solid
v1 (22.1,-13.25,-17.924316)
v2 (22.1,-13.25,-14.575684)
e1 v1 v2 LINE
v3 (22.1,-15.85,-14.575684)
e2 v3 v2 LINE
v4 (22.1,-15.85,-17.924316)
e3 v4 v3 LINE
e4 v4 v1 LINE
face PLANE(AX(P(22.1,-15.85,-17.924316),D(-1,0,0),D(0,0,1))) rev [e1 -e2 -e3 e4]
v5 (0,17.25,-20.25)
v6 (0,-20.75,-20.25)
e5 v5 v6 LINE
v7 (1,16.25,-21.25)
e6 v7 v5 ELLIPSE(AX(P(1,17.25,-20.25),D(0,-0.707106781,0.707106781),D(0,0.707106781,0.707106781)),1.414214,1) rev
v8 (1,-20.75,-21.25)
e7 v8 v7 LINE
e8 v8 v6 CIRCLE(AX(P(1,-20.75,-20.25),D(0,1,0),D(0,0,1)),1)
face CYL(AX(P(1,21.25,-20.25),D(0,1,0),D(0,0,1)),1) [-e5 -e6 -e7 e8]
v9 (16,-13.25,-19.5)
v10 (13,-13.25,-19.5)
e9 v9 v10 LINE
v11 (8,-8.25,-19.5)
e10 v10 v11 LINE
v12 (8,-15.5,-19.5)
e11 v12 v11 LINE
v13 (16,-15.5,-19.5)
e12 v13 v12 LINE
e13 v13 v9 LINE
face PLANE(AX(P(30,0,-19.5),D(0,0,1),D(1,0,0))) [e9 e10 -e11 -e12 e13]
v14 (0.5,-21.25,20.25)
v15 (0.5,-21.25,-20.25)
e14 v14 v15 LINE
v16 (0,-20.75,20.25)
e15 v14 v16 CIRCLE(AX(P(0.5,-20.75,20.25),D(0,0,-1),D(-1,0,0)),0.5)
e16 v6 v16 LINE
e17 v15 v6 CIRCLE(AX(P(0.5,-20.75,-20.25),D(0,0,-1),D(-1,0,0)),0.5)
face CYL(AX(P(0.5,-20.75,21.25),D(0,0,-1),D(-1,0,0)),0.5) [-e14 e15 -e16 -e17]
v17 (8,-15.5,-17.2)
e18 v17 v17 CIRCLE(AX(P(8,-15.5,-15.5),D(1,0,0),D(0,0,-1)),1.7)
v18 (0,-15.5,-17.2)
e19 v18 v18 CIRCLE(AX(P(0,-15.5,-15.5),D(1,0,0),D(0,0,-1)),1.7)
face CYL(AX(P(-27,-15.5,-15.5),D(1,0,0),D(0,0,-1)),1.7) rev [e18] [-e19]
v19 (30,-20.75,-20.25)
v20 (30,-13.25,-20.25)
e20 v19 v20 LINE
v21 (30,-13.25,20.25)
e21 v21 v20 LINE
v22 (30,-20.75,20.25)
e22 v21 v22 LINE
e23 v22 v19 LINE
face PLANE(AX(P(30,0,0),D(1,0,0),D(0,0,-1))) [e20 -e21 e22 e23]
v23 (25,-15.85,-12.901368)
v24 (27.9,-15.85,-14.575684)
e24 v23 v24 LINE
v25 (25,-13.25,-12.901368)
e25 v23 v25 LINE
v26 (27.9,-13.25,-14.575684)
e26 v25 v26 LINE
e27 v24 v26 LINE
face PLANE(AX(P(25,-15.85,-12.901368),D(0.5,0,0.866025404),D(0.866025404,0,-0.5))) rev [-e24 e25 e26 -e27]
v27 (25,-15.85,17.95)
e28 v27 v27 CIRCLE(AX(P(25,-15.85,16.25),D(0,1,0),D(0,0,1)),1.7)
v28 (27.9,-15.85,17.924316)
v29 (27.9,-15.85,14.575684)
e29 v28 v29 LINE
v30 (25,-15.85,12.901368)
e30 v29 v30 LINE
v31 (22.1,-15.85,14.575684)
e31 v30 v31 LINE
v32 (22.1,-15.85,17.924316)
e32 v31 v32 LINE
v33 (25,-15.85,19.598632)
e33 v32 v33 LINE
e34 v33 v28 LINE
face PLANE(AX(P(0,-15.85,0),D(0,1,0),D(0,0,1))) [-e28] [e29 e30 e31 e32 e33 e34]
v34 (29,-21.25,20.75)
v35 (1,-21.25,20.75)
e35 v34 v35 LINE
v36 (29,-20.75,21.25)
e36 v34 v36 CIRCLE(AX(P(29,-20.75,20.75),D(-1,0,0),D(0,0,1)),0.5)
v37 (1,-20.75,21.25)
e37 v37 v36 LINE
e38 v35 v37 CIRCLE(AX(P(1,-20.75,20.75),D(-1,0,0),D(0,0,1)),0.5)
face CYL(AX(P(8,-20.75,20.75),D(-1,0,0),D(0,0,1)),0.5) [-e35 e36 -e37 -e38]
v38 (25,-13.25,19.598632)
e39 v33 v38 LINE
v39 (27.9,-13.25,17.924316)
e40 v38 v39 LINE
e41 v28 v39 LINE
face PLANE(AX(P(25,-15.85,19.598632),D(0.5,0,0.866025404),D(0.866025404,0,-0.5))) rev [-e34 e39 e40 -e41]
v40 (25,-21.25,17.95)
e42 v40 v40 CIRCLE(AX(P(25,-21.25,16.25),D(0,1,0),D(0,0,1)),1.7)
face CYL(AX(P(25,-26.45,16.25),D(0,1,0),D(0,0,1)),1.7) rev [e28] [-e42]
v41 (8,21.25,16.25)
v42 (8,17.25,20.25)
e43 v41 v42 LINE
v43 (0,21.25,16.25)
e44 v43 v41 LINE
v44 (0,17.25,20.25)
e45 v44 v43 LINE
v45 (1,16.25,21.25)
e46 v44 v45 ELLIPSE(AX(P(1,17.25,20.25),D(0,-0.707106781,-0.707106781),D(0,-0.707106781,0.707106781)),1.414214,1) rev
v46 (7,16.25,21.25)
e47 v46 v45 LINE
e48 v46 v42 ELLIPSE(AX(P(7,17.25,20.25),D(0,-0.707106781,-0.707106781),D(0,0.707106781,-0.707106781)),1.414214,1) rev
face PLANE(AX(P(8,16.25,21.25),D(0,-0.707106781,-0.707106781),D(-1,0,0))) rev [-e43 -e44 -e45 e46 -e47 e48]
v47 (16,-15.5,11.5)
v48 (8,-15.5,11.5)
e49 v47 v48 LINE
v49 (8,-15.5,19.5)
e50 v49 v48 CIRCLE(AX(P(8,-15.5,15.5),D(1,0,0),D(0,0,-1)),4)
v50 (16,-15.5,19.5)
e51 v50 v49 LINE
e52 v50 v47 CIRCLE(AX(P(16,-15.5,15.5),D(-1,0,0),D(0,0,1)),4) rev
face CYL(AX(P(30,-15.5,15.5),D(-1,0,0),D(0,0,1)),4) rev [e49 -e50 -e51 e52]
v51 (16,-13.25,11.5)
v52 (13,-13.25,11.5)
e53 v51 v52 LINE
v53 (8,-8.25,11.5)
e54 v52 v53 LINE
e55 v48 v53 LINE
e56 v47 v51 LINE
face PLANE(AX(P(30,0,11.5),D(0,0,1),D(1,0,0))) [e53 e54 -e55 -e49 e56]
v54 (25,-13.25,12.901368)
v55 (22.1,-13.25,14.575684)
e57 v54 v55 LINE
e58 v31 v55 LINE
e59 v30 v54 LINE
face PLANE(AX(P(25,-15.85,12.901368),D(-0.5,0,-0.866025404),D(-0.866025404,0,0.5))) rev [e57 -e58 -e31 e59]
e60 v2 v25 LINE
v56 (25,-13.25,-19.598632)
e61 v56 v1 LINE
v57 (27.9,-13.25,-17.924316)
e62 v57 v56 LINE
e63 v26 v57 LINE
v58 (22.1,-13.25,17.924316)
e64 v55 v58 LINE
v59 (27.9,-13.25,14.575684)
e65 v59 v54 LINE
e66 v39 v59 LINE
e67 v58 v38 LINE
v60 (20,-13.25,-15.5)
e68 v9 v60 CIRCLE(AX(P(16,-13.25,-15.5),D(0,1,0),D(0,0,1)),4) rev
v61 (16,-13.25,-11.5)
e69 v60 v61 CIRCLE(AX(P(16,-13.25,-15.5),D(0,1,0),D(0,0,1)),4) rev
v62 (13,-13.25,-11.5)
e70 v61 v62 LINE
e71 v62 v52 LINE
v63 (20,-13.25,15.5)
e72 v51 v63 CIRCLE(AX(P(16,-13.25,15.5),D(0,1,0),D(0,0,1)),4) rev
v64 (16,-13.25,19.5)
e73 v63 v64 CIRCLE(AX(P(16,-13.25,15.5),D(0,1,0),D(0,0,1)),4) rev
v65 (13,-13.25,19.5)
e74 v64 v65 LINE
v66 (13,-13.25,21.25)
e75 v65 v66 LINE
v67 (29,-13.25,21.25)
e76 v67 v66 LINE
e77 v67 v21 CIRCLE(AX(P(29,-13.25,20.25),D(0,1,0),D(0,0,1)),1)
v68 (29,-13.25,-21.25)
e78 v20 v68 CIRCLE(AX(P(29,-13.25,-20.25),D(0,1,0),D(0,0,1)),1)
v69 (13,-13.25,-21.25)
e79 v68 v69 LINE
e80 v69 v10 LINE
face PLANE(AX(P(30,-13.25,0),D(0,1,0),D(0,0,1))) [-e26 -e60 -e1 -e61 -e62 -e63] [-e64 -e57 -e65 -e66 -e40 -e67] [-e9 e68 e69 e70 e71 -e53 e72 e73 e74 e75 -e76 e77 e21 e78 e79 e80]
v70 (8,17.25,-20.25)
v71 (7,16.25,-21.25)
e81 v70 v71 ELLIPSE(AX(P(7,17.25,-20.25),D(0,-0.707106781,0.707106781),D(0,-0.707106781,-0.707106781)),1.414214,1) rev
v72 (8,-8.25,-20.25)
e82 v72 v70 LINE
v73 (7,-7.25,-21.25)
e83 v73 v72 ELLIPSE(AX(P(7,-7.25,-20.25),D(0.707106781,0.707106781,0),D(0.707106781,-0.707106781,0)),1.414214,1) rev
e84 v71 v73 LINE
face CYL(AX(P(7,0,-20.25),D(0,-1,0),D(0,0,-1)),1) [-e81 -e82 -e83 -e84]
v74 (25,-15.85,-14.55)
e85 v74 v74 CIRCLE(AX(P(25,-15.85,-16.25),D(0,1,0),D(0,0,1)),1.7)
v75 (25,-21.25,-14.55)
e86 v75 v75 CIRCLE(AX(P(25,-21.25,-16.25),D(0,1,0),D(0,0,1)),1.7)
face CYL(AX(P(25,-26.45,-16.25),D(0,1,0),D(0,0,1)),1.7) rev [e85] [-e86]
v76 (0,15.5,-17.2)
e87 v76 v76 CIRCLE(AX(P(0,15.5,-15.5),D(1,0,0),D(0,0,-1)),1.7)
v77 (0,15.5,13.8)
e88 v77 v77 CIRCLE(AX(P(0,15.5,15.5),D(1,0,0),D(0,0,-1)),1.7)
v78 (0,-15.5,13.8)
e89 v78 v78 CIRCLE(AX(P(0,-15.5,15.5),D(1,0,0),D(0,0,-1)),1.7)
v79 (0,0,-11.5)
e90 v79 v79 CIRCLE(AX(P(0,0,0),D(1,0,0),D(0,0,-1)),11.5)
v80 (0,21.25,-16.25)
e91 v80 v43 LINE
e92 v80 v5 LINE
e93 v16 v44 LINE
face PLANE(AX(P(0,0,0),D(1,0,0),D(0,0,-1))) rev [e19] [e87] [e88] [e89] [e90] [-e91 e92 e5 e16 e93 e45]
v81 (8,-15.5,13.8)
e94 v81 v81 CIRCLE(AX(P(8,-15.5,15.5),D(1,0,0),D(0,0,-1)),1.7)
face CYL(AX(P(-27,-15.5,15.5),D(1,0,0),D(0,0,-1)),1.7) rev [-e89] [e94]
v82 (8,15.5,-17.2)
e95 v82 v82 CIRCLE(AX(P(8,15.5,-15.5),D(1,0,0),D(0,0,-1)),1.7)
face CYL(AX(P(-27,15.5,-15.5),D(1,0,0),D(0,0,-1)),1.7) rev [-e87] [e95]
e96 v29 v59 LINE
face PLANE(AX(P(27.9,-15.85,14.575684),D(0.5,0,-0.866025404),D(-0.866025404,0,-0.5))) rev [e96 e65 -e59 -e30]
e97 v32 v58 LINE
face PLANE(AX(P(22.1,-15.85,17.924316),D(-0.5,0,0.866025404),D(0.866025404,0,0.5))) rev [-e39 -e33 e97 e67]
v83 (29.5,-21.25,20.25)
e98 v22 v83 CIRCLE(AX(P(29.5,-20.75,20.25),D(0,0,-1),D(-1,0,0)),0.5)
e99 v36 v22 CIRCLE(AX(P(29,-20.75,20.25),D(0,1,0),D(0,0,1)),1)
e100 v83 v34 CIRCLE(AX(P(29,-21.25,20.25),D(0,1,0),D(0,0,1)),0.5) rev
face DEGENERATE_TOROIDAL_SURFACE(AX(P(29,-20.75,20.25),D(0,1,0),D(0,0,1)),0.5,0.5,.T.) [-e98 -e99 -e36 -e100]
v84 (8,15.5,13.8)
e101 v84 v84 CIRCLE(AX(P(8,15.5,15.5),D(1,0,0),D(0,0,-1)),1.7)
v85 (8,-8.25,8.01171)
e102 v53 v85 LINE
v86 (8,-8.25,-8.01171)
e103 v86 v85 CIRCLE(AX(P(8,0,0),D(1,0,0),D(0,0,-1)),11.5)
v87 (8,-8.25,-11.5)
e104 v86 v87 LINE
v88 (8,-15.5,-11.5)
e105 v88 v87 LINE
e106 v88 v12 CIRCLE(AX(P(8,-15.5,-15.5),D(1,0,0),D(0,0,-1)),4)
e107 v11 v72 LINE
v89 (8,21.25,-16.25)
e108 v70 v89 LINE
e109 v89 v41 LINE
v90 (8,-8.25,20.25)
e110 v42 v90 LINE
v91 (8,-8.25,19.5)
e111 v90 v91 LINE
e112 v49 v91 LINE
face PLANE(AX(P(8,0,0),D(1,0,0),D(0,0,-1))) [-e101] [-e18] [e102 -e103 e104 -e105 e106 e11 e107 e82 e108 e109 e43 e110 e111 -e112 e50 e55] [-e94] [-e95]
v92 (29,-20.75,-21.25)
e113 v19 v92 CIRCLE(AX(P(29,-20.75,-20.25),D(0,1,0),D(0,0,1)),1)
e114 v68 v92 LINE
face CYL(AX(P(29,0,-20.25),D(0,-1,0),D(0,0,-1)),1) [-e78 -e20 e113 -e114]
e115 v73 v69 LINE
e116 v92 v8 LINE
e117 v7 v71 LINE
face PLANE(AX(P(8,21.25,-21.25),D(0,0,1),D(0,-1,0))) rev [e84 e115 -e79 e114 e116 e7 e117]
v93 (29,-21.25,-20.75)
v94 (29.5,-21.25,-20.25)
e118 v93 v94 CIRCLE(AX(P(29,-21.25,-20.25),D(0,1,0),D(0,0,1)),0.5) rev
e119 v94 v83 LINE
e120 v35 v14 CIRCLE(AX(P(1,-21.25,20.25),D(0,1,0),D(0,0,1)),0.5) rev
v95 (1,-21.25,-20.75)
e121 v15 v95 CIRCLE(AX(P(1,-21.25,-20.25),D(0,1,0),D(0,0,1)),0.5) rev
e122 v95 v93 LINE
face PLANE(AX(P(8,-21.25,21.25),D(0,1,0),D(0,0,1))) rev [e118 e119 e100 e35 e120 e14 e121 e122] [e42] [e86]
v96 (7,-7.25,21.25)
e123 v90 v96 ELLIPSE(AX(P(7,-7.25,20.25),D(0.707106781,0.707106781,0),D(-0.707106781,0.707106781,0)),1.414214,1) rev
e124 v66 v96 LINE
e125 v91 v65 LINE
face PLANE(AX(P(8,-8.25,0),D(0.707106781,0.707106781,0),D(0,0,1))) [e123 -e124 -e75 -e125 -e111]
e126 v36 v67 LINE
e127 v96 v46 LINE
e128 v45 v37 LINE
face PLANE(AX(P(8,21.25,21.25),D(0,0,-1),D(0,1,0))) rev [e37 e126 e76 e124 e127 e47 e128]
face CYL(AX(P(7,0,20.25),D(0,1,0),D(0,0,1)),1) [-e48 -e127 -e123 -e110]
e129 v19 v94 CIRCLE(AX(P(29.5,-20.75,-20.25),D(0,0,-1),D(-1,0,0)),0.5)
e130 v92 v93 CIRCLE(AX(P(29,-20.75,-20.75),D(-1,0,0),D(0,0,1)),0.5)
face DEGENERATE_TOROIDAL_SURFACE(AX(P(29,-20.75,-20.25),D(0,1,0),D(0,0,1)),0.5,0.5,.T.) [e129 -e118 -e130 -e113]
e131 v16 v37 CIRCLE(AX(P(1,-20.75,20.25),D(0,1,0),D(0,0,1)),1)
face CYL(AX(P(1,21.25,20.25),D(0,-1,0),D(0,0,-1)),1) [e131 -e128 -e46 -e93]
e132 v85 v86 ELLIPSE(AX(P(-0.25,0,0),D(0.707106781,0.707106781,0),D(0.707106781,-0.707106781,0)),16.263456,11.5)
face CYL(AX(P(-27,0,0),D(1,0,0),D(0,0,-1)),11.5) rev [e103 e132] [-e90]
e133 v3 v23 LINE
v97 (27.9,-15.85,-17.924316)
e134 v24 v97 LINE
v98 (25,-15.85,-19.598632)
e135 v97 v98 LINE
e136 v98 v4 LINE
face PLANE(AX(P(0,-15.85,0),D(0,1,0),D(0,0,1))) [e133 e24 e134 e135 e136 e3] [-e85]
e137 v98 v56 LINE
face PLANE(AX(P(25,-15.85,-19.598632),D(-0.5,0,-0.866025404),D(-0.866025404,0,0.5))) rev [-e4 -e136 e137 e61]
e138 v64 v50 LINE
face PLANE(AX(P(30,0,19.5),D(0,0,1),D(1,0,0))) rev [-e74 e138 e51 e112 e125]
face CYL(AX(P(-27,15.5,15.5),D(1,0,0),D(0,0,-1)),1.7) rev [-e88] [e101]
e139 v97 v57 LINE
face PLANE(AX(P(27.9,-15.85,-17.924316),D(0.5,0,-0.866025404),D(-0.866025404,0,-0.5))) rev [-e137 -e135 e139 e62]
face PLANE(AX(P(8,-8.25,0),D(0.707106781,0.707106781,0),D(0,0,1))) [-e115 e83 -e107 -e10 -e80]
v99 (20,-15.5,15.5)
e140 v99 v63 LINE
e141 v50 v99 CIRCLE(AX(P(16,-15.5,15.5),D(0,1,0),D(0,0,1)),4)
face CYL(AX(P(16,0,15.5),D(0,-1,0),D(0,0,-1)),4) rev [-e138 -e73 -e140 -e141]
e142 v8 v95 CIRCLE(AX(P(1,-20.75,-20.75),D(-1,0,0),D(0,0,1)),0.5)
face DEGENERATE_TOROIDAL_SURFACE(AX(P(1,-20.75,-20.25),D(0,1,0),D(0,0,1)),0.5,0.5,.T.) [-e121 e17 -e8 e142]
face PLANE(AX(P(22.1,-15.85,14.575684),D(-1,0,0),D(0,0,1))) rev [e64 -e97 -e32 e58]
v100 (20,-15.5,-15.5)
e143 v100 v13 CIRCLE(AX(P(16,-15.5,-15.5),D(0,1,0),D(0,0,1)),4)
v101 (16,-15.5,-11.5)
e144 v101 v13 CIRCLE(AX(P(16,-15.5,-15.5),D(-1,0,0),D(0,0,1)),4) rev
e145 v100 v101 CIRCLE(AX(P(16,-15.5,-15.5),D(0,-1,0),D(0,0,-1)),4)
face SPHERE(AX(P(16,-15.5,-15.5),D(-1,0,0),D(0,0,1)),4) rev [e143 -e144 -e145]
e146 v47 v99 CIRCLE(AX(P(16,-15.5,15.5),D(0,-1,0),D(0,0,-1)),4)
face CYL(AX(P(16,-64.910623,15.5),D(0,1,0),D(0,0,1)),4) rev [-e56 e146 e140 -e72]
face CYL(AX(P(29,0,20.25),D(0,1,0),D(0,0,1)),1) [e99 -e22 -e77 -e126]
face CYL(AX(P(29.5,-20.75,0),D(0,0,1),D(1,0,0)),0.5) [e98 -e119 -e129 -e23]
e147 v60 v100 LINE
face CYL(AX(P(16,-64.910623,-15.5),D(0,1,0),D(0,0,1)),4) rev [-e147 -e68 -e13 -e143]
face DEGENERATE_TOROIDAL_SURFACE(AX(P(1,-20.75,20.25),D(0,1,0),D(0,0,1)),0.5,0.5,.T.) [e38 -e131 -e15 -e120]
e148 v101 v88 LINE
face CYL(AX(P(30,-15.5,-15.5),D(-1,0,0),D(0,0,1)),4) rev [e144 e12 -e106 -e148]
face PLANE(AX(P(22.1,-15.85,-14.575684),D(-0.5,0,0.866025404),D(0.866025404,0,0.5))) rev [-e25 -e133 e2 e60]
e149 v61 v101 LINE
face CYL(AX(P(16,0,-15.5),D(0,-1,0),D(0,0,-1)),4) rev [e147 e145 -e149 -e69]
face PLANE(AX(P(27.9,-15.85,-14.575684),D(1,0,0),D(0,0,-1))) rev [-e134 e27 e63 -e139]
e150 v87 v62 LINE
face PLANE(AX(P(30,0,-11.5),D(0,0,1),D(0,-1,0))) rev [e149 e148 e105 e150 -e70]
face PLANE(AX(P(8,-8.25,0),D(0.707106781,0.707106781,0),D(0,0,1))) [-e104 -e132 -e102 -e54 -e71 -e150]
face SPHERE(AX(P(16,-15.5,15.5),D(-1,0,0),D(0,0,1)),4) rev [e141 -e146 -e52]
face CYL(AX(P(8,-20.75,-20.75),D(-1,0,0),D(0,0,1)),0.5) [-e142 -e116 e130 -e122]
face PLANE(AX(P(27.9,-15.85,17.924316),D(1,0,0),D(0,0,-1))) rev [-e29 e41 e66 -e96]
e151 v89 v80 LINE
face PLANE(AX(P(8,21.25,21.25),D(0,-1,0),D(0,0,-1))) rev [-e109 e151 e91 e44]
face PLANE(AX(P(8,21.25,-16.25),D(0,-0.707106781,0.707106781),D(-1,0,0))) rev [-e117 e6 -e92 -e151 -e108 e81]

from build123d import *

# Parameters (mm, degrees)
SKETCH1_W           = 42.5
SKETCH1_H           = 42.5
BOSS_EXTRUDE1_DEPTH = 8
SKETCH2_R           = 1.7
SKETCH2_R_2         = 11.5
CUT_EXTRUDE1_DEPTH  = 35
BOSS_EXTRUDE2_DEPTH = 22
BOSS_EXTRUDE3_REACH = 52.416
SKETCH5_W           = 10
SKETCH5_H           = 42.5
FILLET1_R           = 4
FILLET2_R           = 4
CHAMFER2_SIZE       = 5
CUT_EXTRUDE2_DEPTH  = 2.6
SKETCH7_R           = 1.7
CUT_EXTRUDE3_DEPTH  = 10.6
CHAMFER3_SIZE       = 5
FILLET3_R           = 1
FILLET4_R           = 1
FILLET5_R           = 0.5


# Some blends are built 0.0001 mm under size
with BuildPart() as part:
    # Sketch1 → Boss-Extrude1 (new body)
    with BuildSketch(Plane(origin=(0, 0, 0), x_dir=(0, 0, -1), z_dir=(1, 0, 0))):
        Rectangle(SKETCH1_W, SKETCH1_H)
    extrude(amount=BOSS_EXTRUDE1_DEPTH)

    # Sketch2 → Cut-Extrude1 (cut)
    with BuildSketch(Plane(origin=(8, 0, 0), x_dir=(0, 0, -1), z_dir=(1, 0, 0))):
        with Locations((-15.5, 15.5)):
            Circle(SKETCH2_R)
        with Locations((15.5, 15.5)):
            Circle(SKETCH2_R)
        with Locations((-15.5, -15.5)):
            Circle(SKETCH2_R)
        with Locations((15.5, -15.5)):
            Circle(SKETCH2_R)
        Circle(SKETCH2_R_2)
    extrude(amount=-CUT_EXTRUDE1_DEPTH, mode=Mode.SUBTRACT)

    # Sketch3 → Boss-Extrude2 (add)
    with BuildSketch(Plane(origin=(8, 0, 0), x_dir=(0, 0, -1), z_dir=(1, 0, 0))):
        with BuildLine():
            Line((-19.5, -13.25), (-21.25, -13.25))
            Line((-21.25, -13.25), (-21.25, -21.25))
            Line((-21.25, -21.25), (21.25, -21.25))
            Line((21.25, -21.25), (21.25, -13.25))
            Line((21.25, -13.25), (19.5, -13.25))
            Line((19.5, -13.25), (19.5, -15.5))
            ThreePointArc((19.5, -15.5), (15.5, -19.5), (11.5, -15.5))
            Line((11.5, -15.5), (11.5, -13.25))
            Line((11.5, -13.25), (-11.5, -13.25))
            Line((-11.5, -13.25), (-11.5, -15.5))
            ThreePointArc((-11.5, -15.5), (-15.5, -19.5), (-19.5, -15.5))
            Line((-19.5, -15.5), (-19.5, -13.25))
        make_face()
    extrude(amount=BOSS_EXTRUDE2_DEPTH)

    # Boss-Extrude3: up to this face of the body (flat: up to its plane)
    boss_extrude3_end = Plane(part.part.faces().sort_by_distance((15, -21.25, 0))[0])
    # Sketch5 → Boss-Extrude3 (add, up to the picked face)
    with BuildSketch(Plane(origin=(0, -13.25, 0), x_dir=(1, 0, 0), z_dir=(0, 1, 0)), mode=Mode.PRIVATE) as boss_extrude3_sk1:
        with Locations((25, 0)):
            Rectangle(SKETCH5_W, SKETCH5_H)
    boss_extrude3_tool1 = split(extrude(boss_extrude3_sk1.sketch, amount=-BOSS_EXTRUDE3_REACH, mode=Mode.PRIVATE), bisect_by=boss_extrude3_end, keep=Keep.BOTH, mode=Mode.PRIVATE)
    add(boss_extrude3_tool1.solids().sort_by(Axis((25, -13.25, 0), (0, -1, 0)))[0])

    # Fillet1
    fillet1_edges = [part.edges().sort_by_distance(p)[0] for p in [
        (20, -14.375, 11.5),
        (20, -19.5, 15.5),
        (20, -14.375, 19.5),
    ]]
    fillet(fillet1_edges, radius=FILLET1_R - 0.0001)  # a hair under: the kernel refuses the full size

    # Fillet2
    fillet2_edges = [part.edges().sort_by_distance(p)[0] for p in [
        (20, -14.375, -11.5),
        (20, -19.5, -15.5),
        (20, -14.375, -19.5),
    ]]
    fillet(fillet2_edges, radius=FILLET2_R - 0.0001)  # a hair under: the kernel refuses the full size

    # Chamfer2
    # the kernel refuses this chamfer: 5 mm, written as the material it adds along each edge
    with BuildSketch(Plane(origin=(8, -13.25, -21.25), x_dir=(0.9996219169112968, -0.027495876610586317, 0), z_dir=(0, 0, 1)), Plane(origin=(8, -13.25, 19.5), x_dir=(0.9996219169112968, -0.027495876610586317, 0), z_dir=(0, 0, 1))) as chamfer2_piece_1:
        Polygon((CHAMFER2_SIZE * 0.999621916911, CHAMFER2_SIZE * 0.0274958766106), (-CHAMFER2_SIZE * 0.0274958766106, CHAMFER2_SIZE * 0.999621916911), (0, 0), align=None)
    extrude(amount=1.75)
    with BuildSketch(Plane(origin=(8, -13.25, -21.25), x_dir=(0.9996219169112968, -0.027495876610586317, 0), z_dir=(0, 0, 1))) as chamfer2_piece_2_section:
        Polygon((CHAMFER2_SIZE * 0.999621916911, CHAMFER2_SIZE * 0.0274958766106), (-CHAMFER2_SIZE * 0.0274958766106, CHAMFER2_SIZE * 0.999621916911), (0, 0), align=None)
    chamfer2_piece_2 = extrude(amount=14.60841494, mode=Mode.PRIVATE)
    chamfer2_piece_2 = split(chamfer2_piece_2, bisect_by=Plane(origin=(9.660792582, -11.623563686, -11.5), z_dir=(0, 0, 1)), keep=Keep.TOP, mode=Mode.PRIVATE)
    chamfer2_piece_2 = chamfer2_piece_2 - Plane(origin=(9.660792582, 0, 0), x_dir=(0, 0, -1), z_dir=(1, 0, 0)) * Cylinder(11.5, 50, mode=Mode.PRIVATE)
    add(chamfer2_piece_2)
    with BuildSketch(Plane(origin=(8, -13.25, 6.64158506), x_dir=(0.9996219169112968, -0.027495876610586313, 0), z_dir=(0, 0, 1))) as chamfer2_piece_3_section:
        Polygon((CHAMFER2_SIZE * 0.999621916911, CHAMFER2_SIZE * 0.0274958766106), (-CHAMFER2_SIZE * 0.0274958766106, CHAMFER2_SIZE * 0.999621916911), (0, 0), align=None)
    chamfer2_piece_3 = extrude(amount=14.60841494, mode=Mode.PRIVATE)
    chamfer2_piece_3 = split(chamfer2_piece_3, bisect_by=Plane(origin=(9.660792582, -11.623563686, 11.5), z_dir=(0, 0, -1)), keep=Keep.TOP, mode=Mode.PRIVATE)
    chamfer2_piece_3 = chamfer2_piece_3 - Plane(origin=(9.660792582, 0, 0), x_dir=(0, 0, -1), z_dir=(1, 0, 0)) * Cylinder(11.5, 50, mode=Mode.PRIVATE)
    add(chamfer2_piece_3)
    with BuildSketch(Plane(origin=(8, -13.25, -24.35841494), x_dir=(0.9996219169112968, -0.027495876610586313, 0), z_dir=(0, 0, 1))) as chamfer2_piece_4_section:
        Polygon((CHAMFER2_SIZE * 0.999621916911, CHAMFER2_SIZE * 0.0274958766106), (-CHAMFER2_SIZE * 0.0274958766106, CHAMFER2_SIZE * 0.999621916911), (0, 0), align=None)
    chamfer2_piece_4 = extrude(amount=35.85841494, mode=Mode.PRIVATE)
    chamfer2_piece_4 = split(chamfer2_piece_4, bisect_by=Plane(origin=(9.648968134, -11.601031866, -19.5), z_dir=(0, 0, -1)), keep=Keep.TOP, mode=Mode.PRIVATE)
    chamfer2_piece_4 = split(chamfer2_piece_4, bisect_by=Plane(origin=(9.648968134, -11.601031866, -21.25), z_dir=(0, 0, 1)), keep=Keep.TOP, mode=Mode.PRIVATE)
    add(chamfer2_piece_4)
    with BuildSketch(Plane(origin=(8, -13.25, -11.5), x_dir=(0.9996219169112968, -0.027495876610586317, 0), z_dir=(0, 0, 1))) as chamfer2_piece_5_section:
        Polygon((CHAMFER2_SIZE * 0.999621916911, CHAMFER2_SIZE * 0.0274958766106), (-CHAMFER2_SIZE * 0.0274958766106, CHAMFER2_SIZE * 0.999621916911), (0, 0), align=None)
    chamfer2_piece_5 = extrude(amount=23, mode=Mode.PRIVATE)
    chamfer2_piece_5 = chamfer2_piece_5 - Plane(origin=(9.815143963, 0, 0), x_dir=(0, 0, -1), z_dir=(1, 0, 0)) * Cylinder(11.5, 66, mode=Mode.PRIVATE)
    add(chamfer2_piece_5)
    with BuildSketch(Plane(origin=(8, -13.25, -11.5), x_dir=(0.9996219169112968, -0.027495876610586317, 0), z_dir=(0, 0, 1))) as chamfer2_piece_6_section:
        Polygon((CHAMFER2_SIZE * 0.999621916911, CHAMFER2_SIZE * 0.0274958766106), (-CHAMFER2_SIZE * 0.0274958766106, CHAMFER2_SIZE * 0.999621916911), (0, 0), align=None)
    chamfer2_piece_6 = extrude(amount=35.85841494, mode=Mode.PRIVATE)
    chamfer2_piece_6 = split(chamfer2_piece_6, bisect_by=Plane(origin=(9.648968134, -11.601031866, 19.5), z_dir=(0, 0, 1)), keep=Keep.TOP, mode=Mode.PRIVATE)
    chamfer2_piece_6 = split(chamfer2_piece_6, bisect_by=Plane(origin=(9.648968134, -11.601031866, 21.25), z_dir=(0, 0, -1)), keep=Keep.TOP, mode=Mode.PRIVATE)
    add(chamfer2_piece_6)

    # Sketch6 → Cut-Extrude2 (cut)
    with BuildSketch(Plane(origin=(0, -13.25, 0), x_dir=(1, 0, 0), z_dir=(0, 1, 0))):
        Polygon((25, 12.901368439), (27.9, 14.575684219), (27.9, 17.924315781), (25, 19.598631561), (22.1, 17.924315781), (22.1, 14.575684219), align=None)
        Polygon((25, -19.598631561), (27.9, -17.924315781), (27.9, -14.575684219), (25, -12.901368439), (22.1, -14.575684219), (22.1, -17.924315781), align=None)
    extrude(amount=-CUT_EXTRUDE2_DEPTH, mode=Mode.SUBTRACT)

    # Sketch7 → Cut-Extrude3 (cut)
    with BuildSketch(Plane(origin=(0, -15.85, 0), x_dir=(1, 0, 0), z_dir=(0, 1, 0))):
        with Locations(Location((25, 16.25, 0), (0, 0, 270))):
            Circle(SKETCH7_R)
        with Locations(Location((25, -16.25, 0), (0, 0, 270))):
            Circle(SKETCH7_R)
    extrude(amount=-CUT_EXTRUDE3_DEPTH, mode=Mode.SUBTRACT)

    # Chamfer3
    chamfer3_edges = [part.edges().sort_by_distance(p)[0] for p in [
        (4, 21.25, 21.25),
        (4, 21.25, -21.25),
    ]]
    chamfer(chamfer3_edges, length=CHAMFER3_SIZE)

    # Fillet3
    fillet3_edges = [part.edges().sort_by_distance(p)[0] for p in [
        (0, -2.5, 21.25),
        (30, -17.25, 21.25),
        (30, -17.25, -21.25),
        (0, -2.5, -21.25),
    ]]
    fillet(fillet3_edges, radius=FILLET3_R)

    # Fillet4
    fillet4_edges = [part.edges().sort_by_distance(p)[0] for p in [
        (8, 4, -21.25),
        (8, 4, 21.25),
    ]]
    fillet(fillet4_edges, radius=FILLET4_R)

    # Fillet5
    fillet5_edges = [part.edges().sort_by_distance(p)[0] for p in [
        (30, -21.25, 0),
        (15, -21.25, -21.25),
        (0, -21.25, 0),
        (15, -21.25, 21.25),
        (29.707106781, -21.25, 20.957106781),
        (0.292893219, -21.25, 20.957106781),
        (0.292893219, -21.25, -20.957106781),
        (29.707106781, -21.25, -20.957106781),
    ]]
    fillet(fillet5_edges, radius=FILLET5_R)


solid = part.part
